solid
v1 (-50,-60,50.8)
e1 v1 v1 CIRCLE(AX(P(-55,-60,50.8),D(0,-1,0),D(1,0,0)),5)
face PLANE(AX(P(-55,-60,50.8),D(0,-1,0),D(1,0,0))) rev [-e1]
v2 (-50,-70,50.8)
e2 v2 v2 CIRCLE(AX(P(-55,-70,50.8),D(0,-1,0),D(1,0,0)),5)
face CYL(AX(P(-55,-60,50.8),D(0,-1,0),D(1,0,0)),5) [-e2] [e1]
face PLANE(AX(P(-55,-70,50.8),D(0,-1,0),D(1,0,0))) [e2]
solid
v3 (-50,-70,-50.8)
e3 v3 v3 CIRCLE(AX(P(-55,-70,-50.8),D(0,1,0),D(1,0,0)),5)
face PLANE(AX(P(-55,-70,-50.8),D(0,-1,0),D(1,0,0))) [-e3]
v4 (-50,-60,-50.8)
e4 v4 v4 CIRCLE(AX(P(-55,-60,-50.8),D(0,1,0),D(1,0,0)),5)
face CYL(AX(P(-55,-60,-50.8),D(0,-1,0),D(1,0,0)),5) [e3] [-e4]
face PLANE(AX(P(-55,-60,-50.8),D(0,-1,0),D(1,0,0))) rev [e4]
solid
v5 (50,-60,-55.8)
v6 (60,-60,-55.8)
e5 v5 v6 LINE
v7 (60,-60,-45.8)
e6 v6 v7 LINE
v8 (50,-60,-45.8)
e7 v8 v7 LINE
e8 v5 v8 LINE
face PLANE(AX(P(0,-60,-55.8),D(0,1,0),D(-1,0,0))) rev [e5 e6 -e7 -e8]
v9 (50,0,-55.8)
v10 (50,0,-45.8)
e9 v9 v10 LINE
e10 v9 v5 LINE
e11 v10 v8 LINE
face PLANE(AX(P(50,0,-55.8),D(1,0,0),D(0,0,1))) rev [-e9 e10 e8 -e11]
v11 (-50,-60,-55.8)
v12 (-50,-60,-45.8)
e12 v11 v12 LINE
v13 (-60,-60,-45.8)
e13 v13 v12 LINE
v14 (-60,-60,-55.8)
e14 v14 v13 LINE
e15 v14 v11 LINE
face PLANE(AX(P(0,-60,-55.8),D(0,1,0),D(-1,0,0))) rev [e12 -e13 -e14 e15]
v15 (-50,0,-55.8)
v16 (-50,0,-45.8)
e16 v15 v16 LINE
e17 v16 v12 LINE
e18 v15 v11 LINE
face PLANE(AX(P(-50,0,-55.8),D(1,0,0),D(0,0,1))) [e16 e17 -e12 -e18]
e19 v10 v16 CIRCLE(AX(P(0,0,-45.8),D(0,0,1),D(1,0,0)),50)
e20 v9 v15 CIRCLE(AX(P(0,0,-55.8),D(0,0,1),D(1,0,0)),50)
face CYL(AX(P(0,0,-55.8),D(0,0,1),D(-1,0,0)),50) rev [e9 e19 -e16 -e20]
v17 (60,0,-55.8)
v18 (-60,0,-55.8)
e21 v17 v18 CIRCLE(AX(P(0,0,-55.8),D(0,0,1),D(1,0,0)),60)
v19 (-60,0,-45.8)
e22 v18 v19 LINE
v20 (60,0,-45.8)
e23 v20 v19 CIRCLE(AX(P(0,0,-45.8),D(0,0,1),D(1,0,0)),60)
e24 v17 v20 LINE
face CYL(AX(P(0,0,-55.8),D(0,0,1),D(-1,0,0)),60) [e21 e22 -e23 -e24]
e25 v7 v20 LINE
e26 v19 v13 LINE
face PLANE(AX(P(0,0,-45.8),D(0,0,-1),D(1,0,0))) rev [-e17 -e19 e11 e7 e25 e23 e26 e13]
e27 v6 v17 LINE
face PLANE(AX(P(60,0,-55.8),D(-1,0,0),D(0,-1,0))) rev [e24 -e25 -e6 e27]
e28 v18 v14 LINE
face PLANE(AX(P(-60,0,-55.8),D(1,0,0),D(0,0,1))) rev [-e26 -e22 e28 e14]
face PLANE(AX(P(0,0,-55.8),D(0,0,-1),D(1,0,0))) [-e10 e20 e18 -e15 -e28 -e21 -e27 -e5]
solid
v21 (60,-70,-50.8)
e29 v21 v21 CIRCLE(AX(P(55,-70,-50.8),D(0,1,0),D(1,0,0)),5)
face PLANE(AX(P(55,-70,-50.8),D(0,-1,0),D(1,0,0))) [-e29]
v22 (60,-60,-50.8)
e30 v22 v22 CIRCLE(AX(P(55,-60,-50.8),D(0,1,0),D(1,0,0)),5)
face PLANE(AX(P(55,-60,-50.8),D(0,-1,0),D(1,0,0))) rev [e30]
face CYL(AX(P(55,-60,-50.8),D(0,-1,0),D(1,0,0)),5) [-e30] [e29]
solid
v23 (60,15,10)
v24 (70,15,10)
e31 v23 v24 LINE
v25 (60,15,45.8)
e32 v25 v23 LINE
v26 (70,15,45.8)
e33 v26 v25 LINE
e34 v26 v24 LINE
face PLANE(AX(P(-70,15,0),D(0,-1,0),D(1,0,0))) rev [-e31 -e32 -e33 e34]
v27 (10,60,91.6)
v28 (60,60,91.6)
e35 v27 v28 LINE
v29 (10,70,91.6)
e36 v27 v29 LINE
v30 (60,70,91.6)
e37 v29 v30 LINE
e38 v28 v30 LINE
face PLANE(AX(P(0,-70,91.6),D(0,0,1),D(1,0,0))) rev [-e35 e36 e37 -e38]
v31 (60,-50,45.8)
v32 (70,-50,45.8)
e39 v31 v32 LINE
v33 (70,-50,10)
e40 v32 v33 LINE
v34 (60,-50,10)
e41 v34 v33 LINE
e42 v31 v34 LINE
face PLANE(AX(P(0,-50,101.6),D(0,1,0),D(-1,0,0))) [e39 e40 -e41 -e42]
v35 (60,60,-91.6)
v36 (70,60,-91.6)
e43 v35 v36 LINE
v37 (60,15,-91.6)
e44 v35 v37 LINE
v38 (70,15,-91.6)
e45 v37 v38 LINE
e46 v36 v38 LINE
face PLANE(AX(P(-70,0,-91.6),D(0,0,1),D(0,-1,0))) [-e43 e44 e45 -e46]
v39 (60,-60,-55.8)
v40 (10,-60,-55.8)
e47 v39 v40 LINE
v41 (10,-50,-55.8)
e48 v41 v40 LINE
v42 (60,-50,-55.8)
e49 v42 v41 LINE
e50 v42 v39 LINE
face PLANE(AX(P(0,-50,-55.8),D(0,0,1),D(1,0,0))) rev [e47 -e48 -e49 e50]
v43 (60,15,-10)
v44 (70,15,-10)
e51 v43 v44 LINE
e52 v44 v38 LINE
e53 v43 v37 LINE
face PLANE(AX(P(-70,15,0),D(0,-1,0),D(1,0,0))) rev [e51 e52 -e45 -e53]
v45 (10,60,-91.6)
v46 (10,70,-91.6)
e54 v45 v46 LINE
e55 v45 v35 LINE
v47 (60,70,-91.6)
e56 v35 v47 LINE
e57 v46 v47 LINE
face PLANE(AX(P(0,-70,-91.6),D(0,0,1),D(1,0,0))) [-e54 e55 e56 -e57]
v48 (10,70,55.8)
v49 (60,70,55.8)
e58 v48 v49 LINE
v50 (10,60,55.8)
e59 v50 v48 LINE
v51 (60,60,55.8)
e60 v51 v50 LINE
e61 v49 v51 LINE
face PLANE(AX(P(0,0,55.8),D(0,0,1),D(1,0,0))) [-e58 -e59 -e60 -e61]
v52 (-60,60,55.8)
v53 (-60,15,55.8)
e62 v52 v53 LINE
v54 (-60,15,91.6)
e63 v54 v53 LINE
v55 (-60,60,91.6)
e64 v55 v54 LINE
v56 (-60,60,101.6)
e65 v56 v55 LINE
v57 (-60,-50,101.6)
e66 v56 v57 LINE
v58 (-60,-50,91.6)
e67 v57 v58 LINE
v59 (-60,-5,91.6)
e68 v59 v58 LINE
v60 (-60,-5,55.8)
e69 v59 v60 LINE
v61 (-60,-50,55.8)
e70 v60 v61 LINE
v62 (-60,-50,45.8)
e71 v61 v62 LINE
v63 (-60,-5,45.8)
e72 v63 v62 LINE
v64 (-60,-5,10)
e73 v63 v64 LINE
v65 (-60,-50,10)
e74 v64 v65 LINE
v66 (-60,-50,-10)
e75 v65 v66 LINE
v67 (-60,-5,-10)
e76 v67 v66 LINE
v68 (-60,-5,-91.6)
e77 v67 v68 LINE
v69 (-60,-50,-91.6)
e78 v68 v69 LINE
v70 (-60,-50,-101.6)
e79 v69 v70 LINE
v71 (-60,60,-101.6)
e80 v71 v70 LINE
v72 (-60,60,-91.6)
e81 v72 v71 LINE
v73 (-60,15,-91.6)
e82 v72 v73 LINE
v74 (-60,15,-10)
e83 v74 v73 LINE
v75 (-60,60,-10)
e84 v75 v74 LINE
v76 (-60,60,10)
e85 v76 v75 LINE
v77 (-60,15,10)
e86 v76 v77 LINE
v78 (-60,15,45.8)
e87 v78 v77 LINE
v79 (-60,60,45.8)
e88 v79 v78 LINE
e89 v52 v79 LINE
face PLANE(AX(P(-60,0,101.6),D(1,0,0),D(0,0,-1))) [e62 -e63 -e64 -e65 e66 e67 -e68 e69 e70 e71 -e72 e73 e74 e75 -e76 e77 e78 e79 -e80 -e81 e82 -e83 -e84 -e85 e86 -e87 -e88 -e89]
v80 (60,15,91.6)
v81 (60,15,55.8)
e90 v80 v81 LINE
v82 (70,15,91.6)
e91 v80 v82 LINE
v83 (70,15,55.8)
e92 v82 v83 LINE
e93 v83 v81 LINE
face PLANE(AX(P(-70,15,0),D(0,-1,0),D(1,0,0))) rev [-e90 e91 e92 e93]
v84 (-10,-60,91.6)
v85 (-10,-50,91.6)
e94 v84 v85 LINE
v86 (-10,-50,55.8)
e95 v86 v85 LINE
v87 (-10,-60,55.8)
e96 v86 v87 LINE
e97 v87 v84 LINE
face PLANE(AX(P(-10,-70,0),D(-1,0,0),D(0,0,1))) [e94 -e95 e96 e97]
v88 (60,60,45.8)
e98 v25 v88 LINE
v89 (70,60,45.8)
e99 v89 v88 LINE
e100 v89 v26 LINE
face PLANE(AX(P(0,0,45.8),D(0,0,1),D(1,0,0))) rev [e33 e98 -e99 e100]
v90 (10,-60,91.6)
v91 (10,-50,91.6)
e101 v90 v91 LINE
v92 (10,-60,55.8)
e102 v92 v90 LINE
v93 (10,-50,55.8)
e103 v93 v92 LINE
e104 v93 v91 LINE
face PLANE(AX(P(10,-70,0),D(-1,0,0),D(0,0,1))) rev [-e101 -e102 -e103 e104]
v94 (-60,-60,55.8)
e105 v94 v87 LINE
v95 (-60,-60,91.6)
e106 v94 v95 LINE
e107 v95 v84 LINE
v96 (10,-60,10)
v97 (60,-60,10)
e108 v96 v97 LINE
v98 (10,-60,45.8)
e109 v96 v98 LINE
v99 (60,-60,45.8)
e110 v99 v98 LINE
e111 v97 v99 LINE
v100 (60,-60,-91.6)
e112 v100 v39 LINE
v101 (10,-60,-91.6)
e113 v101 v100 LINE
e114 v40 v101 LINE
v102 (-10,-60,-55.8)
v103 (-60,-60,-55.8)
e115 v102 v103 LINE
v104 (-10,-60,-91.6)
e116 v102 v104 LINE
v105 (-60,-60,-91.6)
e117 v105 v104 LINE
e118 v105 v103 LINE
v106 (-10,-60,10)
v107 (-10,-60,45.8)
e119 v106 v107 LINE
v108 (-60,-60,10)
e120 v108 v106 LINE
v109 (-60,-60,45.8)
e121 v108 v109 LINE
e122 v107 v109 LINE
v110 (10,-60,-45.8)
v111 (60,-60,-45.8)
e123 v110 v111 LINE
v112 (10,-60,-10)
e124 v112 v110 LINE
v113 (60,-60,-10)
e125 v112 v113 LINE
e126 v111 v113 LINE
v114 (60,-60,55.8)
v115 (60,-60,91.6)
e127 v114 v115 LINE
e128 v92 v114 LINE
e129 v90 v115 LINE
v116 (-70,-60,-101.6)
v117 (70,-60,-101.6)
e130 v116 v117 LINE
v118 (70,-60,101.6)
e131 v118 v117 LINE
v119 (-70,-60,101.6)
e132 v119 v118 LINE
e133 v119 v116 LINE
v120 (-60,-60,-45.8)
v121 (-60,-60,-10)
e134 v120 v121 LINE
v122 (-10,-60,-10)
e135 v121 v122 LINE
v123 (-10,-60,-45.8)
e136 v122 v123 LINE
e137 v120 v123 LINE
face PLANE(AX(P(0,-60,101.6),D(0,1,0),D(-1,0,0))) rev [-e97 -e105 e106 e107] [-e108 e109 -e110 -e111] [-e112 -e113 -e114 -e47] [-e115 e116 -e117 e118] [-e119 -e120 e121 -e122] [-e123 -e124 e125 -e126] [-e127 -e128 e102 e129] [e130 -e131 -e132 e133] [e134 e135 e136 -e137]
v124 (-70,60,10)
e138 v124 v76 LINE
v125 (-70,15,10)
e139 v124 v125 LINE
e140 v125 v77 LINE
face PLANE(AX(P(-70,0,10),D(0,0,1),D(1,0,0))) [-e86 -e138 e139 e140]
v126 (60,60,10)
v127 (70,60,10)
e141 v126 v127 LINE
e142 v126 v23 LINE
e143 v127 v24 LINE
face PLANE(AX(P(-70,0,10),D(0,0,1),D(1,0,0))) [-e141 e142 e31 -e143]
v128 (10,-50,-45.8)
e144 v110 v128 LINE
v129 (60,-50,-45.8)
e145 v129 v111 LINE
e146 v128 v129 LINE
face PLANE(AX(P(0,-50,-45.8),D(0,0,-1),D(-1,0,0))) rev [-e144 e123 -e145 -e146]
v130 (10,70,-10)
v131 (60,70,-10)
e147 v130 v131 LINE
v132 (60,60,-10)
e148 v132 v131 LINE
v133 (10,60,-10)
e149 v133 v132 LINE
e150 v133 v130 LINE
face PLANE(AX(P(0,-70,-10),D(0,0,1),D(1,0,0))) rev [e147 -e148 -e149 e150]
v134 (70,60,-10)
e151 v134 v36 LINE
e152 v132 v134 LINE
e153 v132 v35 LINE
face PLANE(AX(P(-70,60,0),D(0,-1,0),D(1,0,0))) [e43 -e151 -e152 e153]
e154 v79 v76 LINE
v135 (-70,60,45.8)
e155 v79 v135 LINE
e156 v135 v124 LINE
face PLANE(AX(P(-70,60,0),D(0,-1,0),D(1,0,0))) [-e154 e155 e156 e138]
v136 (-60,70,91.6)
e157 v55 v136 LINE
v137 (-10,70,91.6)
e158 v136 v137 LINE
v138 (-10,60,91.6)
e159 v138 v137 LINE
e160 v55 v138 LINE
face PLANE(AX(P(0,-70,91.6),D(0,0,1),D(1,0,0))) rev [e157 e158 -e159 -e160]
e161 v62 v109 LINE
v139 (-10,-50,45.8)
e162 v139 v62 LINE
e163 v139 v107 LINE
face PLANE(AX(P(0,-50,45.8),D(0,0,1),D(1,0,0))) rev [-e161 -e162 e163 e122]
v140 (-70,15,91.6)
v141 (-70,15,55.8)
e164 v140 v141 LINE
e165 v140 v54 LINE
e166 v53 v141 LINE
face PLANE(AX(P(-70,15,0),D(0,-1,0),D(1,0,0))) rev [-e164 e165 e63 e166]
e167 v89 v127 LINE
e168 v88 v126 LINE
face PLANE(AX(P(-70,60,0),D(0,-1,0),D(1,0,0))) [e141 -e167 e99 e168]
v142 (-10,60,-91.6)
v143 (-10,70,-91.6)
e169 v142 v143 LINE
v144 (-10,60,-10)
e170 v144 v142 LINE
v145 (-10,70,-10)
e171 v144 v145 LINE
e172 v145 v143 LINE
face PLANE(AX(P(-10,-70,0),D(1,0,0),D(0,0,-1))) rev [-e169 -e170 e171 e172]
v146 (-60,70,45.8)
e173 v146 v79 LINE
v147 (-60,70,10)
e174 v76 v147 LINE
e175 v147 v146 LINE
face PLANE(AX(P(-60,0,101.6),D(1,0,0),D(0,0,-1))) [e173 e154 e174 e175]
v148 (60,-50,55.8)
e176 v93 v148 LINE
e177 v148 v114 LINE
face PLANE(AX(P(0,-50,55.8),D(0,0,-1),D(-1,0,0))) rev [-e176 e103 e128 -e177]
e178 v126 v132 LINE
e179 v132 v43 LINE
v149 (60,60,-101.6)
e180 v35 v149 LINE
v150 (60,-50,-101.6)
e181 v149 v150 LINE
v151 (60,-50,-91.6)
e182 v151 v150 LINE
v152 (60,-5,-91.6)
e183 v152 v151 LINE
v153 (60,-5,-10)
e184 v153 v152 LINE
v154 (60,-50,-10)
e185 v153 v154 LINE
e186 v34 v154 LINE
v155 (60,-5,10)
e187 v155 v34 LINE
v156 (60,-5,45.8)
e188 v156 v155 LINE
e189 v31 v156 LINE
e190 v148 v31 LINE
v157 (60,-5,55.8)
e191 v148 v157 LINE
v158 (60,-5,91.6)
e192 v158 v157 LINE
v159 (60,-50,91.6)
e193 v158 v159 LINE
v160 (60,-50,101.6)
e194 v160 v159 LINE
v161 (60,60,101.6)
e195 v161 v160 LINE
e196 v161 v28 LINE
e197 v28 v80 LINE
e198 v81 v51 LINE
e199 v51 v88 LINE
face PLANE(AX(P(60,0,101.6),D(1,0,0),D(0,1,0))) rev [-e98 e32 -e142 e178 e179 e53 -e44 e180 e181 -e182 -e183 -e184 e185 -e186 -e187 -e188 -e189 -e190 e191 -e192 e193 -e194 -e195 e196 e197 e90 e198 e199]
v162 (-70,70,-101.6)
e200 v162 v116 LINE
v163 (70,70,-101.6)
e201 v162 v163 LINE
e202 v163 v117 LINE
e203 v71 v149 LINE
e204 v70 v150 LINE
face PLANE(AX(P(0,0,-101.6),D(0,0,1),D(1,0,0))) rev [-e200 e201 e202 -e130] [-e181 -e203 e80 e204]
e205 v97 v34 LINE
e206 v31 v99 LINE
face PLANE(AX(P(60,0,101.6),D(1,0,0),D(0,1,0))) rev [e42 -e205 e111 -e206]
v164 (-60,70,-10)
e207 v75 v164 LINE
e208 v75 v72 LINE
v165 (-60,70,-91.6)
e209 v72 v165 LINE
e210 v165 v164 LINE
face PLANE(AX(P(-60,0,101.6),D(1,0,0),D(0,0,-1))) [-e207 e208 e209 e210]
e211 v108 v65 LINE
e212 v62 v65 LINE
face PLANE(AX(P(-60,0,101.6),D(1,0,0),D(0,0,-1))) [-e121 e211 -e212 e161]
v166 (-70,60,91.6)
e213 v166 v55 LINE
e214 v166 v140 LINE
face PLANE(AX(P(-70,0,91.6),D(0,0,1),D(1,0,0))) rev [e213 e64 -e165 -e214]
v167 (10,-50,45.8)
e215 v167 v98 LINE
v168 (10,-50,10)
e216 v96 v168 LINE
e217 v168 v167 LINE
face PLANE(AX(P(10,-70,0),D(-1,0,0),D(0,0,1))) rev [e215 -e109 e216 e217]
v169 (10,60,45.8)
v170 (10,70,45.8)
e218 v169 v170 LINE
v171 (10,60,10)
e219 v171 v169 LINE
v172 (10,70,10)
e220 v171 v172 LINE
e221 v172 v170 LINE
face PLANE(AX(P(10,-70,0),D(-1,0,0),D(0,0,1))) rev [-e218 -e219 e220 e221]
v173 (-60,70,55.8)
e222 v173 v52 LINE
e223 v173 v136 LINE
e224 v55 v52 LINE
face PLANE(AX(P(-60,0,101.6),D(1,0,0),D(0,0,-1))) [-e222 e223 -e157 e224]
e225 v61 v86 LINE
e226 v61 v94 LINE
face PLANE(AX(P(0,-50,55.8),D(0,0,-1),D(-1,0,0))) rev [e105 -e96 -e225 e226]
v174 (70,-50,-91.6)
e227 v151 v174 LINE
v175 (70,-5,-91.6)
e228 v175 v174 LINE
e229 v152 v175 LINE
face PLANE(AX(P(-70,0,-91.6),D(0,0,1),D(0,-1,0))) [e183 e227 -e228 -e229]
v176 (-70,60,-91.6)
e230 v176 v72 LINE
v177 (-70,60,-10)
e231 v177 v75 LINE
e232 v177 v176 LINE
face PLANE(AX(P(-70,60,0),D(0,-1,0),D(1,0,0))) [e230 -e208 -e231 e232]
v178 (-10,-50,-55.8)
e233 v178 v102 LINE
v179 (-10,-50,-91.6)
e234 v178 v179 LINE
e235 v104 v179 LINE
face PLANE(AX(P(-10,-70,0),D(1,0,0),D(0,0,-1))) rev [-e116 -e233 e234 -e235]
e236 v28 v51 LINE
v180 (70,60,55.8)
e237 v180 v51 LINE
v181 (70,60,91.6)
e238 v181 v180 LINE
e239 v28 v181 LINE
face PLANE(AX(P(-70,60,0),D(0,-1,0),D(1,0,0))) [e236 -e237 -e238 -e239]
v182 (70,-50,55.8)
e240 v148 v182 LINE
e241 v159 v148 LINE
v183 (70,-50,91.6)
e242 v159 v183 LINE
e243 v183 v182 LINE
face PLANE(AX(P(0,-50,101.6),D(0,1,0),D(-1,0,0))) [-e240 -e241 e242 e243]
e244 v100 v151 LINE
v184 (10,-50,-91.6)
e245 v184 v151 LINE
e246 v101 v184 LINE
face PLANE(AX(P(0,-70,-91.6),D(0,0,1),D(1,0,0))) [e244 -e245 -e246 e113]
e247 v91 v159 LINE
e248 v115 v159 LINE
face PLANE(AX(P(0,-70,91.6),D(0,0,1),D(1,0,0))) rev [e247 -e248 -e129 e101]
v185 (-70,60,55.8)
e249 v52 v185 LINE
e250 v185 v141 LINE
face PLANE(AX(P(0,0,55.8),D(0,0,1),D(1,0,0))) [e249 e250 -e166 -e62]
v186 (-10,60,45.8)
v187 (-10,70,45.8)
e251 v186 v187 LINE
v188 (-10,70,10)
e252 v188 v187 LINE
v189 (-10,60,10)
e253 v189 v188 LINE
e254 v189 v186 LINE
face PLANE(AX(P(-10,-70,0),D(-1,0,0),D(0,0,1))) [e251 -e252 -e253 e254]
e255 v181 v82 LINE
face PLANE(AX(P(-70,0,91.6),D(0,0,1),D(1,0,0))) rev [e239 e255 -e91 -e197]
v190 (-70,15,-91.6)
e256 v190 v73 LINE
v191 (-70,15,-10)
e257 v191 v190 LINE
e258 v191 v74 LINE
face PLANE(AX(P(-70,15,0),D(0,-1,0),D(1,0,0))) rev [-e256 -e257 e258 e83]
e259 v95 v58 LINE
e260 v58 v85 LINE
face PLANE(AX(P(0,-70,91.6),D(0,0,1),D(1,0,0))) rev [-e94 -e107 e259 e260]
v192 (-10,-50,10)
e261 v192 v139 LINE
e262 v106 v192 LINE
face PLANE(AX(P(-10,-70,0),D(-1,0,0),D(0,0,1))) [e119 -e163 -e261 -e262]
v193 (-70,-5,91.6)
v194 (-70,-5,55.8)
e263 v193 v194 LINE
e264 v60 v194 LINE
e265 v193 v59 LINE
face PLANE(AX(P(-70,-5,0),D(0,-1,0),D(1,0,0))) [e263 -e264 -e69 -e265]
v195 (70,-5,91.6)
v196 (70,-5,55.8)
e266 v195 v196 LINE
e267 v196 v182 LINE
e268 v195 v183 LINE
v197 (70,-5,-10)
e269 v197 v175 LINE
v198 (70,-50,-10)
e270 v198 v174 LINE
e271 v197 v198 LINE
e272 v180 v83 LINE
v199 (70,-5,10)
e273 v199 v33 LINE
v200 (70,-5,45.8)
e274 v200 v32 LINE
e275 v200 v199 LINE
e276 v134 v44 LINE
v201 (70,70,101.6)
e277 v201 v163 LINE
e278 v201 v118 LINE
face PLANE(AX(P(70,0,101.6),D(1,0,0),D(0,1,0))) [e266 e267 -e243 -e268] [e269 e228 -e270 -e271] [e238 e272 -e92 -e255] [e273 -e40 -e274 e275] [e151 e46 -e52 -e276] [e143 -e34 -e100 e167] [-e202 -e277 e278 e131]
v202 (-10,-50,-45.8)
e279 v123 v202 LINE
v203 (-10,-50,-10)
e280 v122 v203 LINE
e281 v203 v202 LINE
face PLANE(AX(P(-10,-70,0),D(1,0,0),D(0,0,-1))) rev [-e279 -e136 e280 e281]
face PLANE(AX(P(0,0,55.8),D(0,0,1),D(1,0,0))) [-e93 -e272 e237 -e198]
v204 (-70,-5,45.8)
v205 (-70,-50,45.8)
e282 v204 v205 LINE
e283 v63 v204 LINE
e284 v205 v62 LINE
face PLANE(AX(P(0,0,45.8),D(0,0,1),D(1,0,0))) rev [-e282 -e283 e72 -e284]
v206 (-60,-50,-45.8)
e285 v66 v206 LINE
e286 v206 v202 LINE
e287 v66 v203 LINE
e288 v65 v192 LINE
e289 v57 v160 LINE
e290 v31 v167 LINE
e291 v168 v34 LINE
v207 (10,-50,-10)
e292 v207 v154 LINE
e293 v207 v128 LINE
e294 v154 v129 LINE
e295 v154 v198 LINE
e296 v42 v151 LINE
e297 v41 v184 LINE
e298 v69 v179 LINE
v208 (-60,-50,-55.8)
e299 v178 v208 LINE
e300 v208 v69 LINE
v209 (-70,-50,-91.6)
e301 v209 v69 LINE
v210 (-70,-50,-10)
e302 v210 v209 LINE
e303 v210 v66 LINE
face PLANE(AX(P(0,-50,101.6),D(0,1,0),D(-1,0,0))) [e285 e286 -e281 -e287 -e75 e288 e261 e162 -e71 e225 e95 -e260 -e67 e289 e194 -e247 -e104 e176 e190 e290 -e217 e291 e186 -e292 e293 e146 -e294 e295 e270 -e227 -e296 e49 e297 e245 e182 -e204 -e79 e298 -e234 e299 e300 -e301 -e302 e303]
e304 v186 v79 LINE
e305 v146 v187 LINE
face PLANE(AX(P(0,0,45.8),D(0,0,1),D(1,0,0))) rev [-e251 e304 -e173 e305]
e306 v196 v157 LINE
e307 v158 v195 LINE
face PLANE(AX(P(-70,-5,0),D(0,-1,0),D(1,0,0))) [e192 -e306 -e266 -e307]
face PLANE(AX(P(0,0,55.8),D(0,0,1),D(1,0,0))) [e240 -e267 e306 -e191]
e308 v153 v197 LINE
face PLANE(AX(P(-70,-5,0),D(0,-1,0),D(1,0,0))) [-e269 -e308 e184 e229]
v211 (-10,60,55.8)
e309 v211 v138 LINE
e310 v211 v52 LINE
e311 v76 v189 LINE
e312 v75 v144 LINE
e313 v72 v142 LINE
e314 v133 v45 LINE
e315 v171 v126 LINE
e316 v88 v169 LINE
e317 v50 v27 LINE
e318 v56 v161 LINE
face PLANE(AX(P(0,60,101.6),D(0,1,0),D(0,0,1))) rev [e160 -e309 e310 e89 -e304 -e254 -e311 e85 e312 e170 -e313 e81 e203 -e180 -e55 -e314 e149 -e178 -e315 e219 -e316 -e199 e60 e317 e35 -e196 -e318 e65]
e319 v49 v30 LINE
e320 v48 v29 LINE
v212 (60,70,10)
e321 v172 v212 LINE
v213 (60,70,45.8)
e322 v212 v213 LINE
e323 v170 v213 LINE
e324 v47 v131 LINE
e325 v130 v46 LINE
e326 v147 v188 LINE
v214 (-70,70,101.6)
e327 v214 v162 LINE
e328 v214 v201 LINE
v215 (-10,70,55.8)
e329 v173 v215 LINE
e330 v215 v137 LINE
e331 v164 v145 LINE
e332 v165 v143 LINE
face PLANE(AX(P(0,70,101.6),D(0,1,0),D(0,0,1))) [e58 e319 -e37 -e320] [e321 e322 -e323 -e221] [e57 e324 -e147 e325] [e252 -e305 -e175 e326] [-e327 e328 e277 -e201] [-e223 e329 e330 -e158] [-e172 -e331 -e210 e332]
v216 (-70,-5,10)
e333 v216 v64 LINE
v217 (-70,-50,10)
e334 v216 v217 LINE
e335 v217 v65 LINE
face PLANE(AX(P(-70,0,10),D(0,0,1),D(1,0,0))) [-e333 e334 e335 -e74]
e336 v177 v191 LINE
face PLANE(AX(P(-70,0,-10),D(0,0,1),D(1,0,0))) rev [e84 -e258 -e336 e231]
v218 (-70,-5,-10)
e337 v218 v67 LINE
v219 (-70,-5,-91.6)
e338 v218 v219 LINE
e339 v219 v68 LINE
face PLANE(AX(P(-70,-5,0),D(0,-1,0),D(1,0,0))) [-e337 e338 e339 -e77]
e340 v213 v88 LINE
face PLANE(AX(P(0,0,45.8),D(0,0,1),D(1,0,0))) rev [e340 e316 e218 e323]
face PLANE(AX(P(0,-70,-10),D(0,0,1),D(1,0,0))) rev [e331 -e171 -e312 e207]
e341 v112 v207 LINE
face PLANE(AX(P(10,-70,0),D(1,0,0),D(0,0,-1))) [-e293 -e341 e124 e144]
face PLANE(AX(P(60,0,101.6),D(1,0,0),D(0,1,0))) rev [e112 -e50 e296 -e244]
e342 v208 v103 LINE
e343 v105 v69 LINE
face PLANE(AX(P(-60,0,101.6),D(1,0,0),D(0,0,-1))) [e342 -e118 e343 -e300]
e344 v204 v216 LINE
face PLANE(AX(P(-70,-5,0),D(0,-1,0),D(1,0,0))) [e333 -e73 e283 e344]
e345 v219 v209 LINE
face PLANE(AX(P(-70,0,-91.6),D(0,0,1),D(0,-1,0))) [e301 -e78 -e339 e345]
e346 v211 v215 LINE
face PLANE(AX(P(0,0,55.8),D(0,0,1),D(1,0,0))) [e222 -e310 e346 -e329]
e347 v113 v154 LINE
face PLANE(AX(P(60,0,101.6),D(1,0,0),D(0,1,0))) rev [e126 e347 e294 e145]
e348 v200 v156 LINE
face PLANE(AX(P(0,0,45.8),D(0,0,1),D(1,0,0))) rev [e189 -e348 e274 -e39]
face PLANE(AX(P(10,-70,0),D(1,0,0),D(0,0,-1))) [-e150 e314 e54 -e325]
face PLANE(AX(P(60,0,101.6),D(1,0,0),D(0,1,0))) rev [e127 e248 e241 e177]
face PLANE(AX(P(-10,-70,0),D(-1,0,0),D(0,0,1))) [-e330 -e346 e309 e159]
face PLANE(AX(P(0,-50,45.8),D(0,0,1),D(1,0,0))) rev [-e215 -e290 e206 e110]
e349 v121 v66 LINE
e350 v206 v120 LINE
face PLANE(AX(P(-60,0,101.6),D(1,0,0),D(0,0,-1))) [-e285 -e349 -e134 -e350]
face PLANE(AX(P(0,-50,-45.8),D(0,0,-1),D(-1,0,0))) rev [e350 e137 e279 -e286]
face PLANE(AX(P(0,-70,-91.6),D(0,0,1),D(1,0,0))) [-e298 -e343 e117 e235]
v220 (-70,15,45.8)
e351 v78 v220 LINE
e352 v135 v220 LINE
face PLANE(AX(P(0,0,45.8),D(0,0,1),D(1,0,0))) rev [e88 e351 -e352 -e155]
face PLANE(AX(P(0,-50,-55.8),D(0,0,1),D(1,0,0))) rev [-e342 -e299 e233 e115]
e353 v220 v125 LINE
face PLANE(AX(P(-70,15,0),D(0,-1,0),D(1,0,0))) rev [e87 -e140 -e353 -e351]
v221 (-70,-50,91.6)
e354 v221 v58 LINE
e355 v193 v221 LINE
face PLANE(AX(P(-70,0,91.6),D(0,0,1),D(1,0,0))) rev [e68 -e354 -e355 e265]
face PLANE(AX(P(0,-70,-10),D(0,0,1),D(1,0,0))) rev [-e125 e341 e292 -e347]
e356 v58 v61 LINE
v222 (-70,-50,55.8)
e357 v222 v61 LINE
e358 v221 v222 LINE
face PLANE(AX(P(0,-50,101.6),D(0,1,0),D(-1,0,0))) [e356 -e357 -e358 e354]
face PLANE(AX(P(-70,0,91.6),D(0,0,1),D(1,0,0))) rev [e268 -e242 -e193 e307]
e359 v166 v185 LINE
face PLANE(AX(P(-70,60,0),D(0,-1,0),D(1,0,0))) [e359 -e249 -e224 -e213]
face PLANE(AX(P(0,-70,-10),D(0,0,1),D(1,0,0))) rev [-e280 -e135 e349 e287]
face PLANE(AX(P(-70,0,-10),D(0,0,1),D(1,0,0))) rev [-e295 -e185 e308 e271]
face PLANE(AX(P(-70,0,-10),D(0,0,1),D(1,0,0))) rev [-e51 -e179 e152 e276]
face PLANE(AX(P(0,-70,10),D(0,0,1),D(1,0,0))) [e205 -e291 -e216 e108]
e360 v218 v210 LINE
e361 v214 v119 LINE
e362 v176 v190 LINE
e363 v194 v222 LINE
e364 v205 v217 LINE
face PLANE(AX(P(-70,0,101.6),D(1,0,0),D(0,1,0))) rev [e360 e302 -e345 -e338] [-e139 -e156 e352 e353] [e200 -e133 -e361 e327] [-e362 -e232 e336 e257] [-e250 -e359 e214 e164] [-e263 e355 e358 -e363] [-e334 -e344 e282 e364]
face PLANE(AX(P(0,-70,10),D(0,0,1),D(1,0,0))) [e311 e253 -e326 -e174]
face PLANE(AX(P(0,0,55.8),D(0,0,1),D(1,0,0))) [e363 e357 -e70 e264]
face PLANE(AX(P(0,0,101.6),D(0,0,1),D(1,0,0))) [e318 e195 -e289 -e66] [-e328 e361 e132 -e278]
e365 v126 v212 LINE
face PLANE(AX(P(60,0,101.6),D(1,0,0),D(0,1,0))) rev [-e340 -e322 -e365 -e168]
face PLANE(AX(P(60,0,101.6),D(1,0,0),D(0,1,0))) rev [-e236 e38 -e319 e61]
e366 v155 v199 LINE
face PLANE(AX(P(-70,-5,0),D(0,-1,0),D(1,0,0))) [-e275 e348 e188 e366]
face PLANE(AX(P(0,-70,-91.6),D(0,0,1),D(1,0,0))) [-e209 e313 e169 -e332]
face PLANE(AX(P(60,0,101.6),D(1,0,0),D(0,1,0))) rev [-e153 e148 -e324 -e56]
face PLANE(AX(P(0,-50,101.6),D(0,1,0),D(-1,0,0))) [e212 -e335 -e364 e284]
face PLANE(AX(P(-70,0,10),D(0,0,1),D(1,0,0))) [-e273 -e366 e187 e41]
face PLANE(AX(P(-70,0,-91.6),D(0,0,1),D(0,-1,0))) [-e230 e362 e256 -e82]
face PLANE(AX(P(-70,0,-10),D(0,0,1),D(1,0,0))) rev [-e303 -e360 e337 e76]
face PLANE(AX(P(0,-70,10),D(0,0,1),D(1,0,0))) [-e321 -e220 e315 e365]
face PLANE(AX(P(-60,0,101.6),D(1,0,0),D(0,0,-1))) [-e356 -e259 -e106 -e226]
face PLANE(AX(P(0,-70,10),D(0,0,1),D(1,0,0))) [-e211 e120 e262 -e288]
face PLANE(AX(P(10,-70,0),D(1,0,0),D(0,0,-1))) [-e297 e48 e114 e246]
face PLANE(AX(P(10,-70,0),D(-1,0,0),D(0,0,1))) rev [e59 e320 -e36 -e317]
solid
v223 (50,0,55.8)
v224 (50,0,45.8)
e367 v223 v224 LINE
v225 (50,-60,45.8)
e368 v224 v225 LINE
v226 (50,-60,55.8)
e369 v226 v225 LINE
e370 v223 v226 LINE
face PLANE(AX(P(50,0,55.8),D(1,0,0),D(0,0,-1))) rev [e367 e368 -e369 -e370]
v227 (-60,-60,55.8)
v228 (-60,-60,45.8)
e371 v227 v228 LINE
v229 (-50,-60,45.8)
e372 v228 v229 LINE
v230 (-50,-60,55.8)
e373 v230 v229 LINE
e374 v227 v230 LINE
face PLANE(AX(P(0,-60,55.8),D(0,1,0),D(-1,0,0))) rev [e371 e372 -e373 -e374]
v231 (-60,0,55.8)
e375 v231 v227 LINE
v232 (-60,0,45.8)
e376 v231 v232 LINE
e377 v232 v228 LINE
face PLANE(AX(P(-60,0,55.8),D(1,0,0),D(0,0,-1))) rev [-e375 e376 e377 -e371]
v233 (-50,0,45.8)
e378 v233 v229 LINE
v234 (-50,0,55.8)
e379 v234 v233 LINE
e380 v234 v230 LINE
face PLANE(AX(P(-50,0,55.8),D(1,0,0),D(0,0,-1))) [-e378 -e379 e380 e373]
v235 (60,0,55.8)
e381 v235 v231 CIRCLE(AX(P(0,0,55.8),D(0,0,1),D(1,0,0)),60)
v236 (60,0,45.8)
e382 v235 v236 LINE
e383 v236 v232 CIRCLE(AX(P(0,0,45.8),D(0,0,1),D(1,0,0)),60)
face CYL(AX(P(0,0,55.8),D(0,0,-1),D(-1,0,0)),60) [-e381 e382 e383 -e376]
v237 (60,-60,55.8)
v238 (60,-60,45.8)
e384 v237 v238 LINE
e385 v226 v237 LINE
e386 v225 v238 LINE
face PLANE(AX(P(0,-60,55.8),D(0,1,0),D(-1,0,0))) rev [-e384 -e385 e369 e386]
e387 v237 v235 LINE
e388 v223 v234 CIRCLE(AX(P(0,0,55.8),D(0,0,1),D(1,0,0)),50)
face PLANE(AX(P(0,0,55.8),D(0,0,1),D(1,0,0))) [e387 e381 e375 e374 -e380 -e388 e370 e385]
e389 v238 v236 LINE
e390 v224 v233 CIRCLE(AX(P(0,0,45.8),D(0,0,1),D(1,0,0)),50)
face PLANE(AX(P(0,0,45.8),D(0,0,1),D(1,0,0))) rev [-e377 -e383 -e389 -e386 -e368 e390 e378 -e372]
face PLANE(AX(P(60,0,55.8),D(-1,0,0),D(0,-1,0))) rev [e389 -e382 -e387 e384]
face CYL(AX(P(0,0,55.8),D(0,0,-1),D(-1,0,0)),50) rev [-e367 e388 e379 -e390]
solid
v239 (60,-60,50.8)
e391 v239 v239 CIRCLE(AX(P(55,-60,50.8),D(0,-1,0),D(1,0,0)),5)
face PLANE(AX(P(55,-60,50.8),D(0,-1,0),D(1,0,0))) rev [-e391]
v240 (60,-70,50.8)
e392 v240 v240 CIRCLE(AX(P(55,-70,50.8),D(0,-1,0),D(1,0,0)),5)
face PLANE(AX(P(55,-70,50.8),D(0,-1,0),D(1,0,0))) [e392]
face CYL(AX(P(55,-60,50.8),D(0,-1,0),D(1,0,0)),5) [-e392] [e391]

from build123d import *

# Parameters (mm, degrees)
CHASSIS_FRAME_SKETCH_W  = 140
CHASSIS_FRAME_SKETCH_H  = 130
CHASSIS_FRAME_DEPTH     = 101.6
U_BOLT_1_DEPTH          = 5
SKETCH20_R              = 5
U_BOLTS_BOLTS_1_DEPTH   = 10
U_BOLTS_BOLTS_1_2_DEPTH = 10
CUT_EXTRUDE2_DEPTH      = 187.608038412
CUT_EXTRUDE2_DEPTH_BACK = 187.608038412
SKETCH21_W              = 50
SKETCH21_H              = 81.6
CUT_EXTRUDE3_DEPTH      = 187.608038412
CUT_EXTRUDE3_DEPTH_BACK = 187.608038412
SKETCH22_W              = 81.6
SKETCH22_H              = 45
SKETCH23_W              = 50
SKETCH23_H              = 10
BOSS_EXTRUDE10_DEPTH    = 10
BOSS_EXTRUDE11_DEPTH    = 10
SKETCH25_W              = 140
SKETCH25_H              = 130
SKETCH25_W_2            = 120
SKETCH25_H_2            = 110
BOSS_EXTRUDE12_DEPTH    = 5


with BuildPart() as part:
    # Chassis Frame Sketch → Chassis Frame (new, symmetric)
    with BuildSketch(Plane.XY):
        with Locations((0, 5)):
            Rectangle(CHASSIS_FRAME_SKETCH_W, CHASSIS_FRAME_SKETCH_H)
        Polygon((-60, -50), (-60, 60), (60, 60), (60, -50), (50, -50), (-5.1e-08, -50), (-50, -50), align=None, mode=Mode.SUBTRACT)
    extrude(amount=CHASSIS_FRAME_DEPTH, both=True)

    # Sketch21 → Cut-Extrude2 (cut, two sides: drawn at the far end of the back side and taken through both)
    with BuildSketch(Plane(origin=(0, 70, 0), x_dir=(1, 0, 0), z_dir=(0, 1, 0)).offset(-CUT_EXTRUDE2_DEPTH_BACK)):
        with Locations((-35, 50.8)):
            Rectangle(SKETCH21_W, SKETCH21_H)
        with Locations((35, 50.8)):
            Rectangle(SKETCH21_W, SKETCH21_H)
        with Locations((-35, -50.8)):
            Rectangle(SKETCH21_W, SKETCH21_H)
        with Locations((35, -50.8)):
            Rectangle(SKETCH21_W, SKETCH21_H)
    extrude(amount=CUT_EXTRUDE2_DEPTH + CUT_EXTRUDE2_DEPTH_BACK, mode=Mode.SUBTRACT)

    # Sketch22 → Cut-Extrude3 (cut, two sides: drawn at the far end of the back side and taken through both)
    with BuildSketch(Plane(origin=(70, 0, 0), x_dir=(0, 0, -1), z_dir=(1, 0, 0)).offset(-CUT_EXTRUDE3_DEPTH_BACK)):
        with Locations((-50.8, 37.5)):
            Rectangle(SKETCH22_W, SKETCH22_H)
        with Locations((50.8, 37.5)):
            Rectangle(SKETCH22_W, SKETCH22_H)
        with Locations((-50.8, -27.5)):
            Rectangle(SKETCH22_W, SKETCH22_H)
        with Locations((50.8, -27.5)):
            Rectangle(SKETCH22_W, SKETCH22_H)
    extrude(amount=CUT_EXTRUDE3_DEPTH + CUT_EXTRUDE3_DEPTH_BACK, mode=Mode.SUBTRACT)

    # Sketch23 → Boss-Extrude10 (add)
    with BuildSketch(Plane(origin=(0, -60, 0), x_dir=(1, 0, 0), z_dir=(0, 1, 0))):
        with Locations((-35, -50.8)):
            Rectangle(SKETCH23_W, SKETCH23_H)
        with Locations((35, -50.8)):
            Rectangle(SKETCH23_W, SKETCH23_H)
    extrude(amount=BOSS_EXTRUDE10_DEPTH)

    # Sketch24 → Boss-Extrude11 (add)
    with BuildSketch(Plane(origin=(0, -60, 0), x_dir=(1, 0, 0), z_dir=(0, 1, 0))):
        Polygon((-60, 55.8), (-60, 45.8), (60, 45.8), (60, 55.8), (10, 55.8), (-10, 55.8), align=None)
    extrude(amount=BOSS_EXTRUDE11_DEPTH)

    # Sketch25 → Boss-Extrude12 (add, symmetric)
    with BuildSketch(Plane.XY.offset(50.8)):
        with Locations((0, 5)):
            Rectangle(SKETCH25_W, SKETCH25_H)
        with Locations((0, 5)):
            Rectangle(SKETCH25_W_2, SKETCH25_H_2, mode=Mode.SUBTRACT)
    extrude(amount=BOSS_EXTRUDE12_DEPTH, both=True)


with BuildPart() as body_2:
    # U Bolt Sketch → U Bolt 1 (new, symmetric)
    with BuildSketch(Plane.XY.offset(50.8)):
        with BuildLine():
            ThreePointArc((-50, 0), (0, 50), (50, 0))
            Line((50, 0), (50, -60))
            Line((50, -60), (60, -60))
            Line((60, -60), (60, 0))
            ThreePointArc((60, 0), (0, 60), (-60, 0))
            Line((-60, 0), (-60, -60))
            Line((-60, -60), (-50, -60))
            Line((-50, -60), (-50, 0))
        make_face()
    extrude(amount=U_BOLT_1_DEPTH, both=True)


with BuildPart() as body_3:
    # U Bolt 2: mirrored copy
    add(body_2.part.mirror(Plane.XY))


with BuildPart() as body_4:
    # Sketch20 → U Bolts Bolts 1 (new body)
    with BuildSketch(Plane(origin=(0, -70, 0), x_dir=(-1, 0, 0), z_dir=(0, -1, 0))):
        with Locations((55, -50.8)):
            Circle(SKETCH20_R)
    extrude(amount=-U_BOLTS_BOLTS_1_DEPTH)


with BuildPart() as body_5:
    # Sketch20 → U Bolts Bolts 1 2 (new body)
    with BuildSketch(Plane(origin=(0, -70, 0), x_dir=(-1, 0, 0), z_dir=(0, -1, 0))):
        with Locations((-55, -50.8)):
            Circle(SKETCH20_R)
    extrude(amount=-U_BOLTS_BOLTS_1_2_DEPTH)


with BuildPart() as body_6:
    # U Bolts Bolts 2: mirrored copy
    add(body_4.part.mirror(Plane.XY))


with BuildPart() as body_7:
    # U Bolts Bolts 2 2: mirrored copy
    add(body_5.part.mirror(Plane.XY))


solid = Compound([part.part, body_2.part, body_3.part, body_4.part, body_5.part, body_6.part, body_7.part])
